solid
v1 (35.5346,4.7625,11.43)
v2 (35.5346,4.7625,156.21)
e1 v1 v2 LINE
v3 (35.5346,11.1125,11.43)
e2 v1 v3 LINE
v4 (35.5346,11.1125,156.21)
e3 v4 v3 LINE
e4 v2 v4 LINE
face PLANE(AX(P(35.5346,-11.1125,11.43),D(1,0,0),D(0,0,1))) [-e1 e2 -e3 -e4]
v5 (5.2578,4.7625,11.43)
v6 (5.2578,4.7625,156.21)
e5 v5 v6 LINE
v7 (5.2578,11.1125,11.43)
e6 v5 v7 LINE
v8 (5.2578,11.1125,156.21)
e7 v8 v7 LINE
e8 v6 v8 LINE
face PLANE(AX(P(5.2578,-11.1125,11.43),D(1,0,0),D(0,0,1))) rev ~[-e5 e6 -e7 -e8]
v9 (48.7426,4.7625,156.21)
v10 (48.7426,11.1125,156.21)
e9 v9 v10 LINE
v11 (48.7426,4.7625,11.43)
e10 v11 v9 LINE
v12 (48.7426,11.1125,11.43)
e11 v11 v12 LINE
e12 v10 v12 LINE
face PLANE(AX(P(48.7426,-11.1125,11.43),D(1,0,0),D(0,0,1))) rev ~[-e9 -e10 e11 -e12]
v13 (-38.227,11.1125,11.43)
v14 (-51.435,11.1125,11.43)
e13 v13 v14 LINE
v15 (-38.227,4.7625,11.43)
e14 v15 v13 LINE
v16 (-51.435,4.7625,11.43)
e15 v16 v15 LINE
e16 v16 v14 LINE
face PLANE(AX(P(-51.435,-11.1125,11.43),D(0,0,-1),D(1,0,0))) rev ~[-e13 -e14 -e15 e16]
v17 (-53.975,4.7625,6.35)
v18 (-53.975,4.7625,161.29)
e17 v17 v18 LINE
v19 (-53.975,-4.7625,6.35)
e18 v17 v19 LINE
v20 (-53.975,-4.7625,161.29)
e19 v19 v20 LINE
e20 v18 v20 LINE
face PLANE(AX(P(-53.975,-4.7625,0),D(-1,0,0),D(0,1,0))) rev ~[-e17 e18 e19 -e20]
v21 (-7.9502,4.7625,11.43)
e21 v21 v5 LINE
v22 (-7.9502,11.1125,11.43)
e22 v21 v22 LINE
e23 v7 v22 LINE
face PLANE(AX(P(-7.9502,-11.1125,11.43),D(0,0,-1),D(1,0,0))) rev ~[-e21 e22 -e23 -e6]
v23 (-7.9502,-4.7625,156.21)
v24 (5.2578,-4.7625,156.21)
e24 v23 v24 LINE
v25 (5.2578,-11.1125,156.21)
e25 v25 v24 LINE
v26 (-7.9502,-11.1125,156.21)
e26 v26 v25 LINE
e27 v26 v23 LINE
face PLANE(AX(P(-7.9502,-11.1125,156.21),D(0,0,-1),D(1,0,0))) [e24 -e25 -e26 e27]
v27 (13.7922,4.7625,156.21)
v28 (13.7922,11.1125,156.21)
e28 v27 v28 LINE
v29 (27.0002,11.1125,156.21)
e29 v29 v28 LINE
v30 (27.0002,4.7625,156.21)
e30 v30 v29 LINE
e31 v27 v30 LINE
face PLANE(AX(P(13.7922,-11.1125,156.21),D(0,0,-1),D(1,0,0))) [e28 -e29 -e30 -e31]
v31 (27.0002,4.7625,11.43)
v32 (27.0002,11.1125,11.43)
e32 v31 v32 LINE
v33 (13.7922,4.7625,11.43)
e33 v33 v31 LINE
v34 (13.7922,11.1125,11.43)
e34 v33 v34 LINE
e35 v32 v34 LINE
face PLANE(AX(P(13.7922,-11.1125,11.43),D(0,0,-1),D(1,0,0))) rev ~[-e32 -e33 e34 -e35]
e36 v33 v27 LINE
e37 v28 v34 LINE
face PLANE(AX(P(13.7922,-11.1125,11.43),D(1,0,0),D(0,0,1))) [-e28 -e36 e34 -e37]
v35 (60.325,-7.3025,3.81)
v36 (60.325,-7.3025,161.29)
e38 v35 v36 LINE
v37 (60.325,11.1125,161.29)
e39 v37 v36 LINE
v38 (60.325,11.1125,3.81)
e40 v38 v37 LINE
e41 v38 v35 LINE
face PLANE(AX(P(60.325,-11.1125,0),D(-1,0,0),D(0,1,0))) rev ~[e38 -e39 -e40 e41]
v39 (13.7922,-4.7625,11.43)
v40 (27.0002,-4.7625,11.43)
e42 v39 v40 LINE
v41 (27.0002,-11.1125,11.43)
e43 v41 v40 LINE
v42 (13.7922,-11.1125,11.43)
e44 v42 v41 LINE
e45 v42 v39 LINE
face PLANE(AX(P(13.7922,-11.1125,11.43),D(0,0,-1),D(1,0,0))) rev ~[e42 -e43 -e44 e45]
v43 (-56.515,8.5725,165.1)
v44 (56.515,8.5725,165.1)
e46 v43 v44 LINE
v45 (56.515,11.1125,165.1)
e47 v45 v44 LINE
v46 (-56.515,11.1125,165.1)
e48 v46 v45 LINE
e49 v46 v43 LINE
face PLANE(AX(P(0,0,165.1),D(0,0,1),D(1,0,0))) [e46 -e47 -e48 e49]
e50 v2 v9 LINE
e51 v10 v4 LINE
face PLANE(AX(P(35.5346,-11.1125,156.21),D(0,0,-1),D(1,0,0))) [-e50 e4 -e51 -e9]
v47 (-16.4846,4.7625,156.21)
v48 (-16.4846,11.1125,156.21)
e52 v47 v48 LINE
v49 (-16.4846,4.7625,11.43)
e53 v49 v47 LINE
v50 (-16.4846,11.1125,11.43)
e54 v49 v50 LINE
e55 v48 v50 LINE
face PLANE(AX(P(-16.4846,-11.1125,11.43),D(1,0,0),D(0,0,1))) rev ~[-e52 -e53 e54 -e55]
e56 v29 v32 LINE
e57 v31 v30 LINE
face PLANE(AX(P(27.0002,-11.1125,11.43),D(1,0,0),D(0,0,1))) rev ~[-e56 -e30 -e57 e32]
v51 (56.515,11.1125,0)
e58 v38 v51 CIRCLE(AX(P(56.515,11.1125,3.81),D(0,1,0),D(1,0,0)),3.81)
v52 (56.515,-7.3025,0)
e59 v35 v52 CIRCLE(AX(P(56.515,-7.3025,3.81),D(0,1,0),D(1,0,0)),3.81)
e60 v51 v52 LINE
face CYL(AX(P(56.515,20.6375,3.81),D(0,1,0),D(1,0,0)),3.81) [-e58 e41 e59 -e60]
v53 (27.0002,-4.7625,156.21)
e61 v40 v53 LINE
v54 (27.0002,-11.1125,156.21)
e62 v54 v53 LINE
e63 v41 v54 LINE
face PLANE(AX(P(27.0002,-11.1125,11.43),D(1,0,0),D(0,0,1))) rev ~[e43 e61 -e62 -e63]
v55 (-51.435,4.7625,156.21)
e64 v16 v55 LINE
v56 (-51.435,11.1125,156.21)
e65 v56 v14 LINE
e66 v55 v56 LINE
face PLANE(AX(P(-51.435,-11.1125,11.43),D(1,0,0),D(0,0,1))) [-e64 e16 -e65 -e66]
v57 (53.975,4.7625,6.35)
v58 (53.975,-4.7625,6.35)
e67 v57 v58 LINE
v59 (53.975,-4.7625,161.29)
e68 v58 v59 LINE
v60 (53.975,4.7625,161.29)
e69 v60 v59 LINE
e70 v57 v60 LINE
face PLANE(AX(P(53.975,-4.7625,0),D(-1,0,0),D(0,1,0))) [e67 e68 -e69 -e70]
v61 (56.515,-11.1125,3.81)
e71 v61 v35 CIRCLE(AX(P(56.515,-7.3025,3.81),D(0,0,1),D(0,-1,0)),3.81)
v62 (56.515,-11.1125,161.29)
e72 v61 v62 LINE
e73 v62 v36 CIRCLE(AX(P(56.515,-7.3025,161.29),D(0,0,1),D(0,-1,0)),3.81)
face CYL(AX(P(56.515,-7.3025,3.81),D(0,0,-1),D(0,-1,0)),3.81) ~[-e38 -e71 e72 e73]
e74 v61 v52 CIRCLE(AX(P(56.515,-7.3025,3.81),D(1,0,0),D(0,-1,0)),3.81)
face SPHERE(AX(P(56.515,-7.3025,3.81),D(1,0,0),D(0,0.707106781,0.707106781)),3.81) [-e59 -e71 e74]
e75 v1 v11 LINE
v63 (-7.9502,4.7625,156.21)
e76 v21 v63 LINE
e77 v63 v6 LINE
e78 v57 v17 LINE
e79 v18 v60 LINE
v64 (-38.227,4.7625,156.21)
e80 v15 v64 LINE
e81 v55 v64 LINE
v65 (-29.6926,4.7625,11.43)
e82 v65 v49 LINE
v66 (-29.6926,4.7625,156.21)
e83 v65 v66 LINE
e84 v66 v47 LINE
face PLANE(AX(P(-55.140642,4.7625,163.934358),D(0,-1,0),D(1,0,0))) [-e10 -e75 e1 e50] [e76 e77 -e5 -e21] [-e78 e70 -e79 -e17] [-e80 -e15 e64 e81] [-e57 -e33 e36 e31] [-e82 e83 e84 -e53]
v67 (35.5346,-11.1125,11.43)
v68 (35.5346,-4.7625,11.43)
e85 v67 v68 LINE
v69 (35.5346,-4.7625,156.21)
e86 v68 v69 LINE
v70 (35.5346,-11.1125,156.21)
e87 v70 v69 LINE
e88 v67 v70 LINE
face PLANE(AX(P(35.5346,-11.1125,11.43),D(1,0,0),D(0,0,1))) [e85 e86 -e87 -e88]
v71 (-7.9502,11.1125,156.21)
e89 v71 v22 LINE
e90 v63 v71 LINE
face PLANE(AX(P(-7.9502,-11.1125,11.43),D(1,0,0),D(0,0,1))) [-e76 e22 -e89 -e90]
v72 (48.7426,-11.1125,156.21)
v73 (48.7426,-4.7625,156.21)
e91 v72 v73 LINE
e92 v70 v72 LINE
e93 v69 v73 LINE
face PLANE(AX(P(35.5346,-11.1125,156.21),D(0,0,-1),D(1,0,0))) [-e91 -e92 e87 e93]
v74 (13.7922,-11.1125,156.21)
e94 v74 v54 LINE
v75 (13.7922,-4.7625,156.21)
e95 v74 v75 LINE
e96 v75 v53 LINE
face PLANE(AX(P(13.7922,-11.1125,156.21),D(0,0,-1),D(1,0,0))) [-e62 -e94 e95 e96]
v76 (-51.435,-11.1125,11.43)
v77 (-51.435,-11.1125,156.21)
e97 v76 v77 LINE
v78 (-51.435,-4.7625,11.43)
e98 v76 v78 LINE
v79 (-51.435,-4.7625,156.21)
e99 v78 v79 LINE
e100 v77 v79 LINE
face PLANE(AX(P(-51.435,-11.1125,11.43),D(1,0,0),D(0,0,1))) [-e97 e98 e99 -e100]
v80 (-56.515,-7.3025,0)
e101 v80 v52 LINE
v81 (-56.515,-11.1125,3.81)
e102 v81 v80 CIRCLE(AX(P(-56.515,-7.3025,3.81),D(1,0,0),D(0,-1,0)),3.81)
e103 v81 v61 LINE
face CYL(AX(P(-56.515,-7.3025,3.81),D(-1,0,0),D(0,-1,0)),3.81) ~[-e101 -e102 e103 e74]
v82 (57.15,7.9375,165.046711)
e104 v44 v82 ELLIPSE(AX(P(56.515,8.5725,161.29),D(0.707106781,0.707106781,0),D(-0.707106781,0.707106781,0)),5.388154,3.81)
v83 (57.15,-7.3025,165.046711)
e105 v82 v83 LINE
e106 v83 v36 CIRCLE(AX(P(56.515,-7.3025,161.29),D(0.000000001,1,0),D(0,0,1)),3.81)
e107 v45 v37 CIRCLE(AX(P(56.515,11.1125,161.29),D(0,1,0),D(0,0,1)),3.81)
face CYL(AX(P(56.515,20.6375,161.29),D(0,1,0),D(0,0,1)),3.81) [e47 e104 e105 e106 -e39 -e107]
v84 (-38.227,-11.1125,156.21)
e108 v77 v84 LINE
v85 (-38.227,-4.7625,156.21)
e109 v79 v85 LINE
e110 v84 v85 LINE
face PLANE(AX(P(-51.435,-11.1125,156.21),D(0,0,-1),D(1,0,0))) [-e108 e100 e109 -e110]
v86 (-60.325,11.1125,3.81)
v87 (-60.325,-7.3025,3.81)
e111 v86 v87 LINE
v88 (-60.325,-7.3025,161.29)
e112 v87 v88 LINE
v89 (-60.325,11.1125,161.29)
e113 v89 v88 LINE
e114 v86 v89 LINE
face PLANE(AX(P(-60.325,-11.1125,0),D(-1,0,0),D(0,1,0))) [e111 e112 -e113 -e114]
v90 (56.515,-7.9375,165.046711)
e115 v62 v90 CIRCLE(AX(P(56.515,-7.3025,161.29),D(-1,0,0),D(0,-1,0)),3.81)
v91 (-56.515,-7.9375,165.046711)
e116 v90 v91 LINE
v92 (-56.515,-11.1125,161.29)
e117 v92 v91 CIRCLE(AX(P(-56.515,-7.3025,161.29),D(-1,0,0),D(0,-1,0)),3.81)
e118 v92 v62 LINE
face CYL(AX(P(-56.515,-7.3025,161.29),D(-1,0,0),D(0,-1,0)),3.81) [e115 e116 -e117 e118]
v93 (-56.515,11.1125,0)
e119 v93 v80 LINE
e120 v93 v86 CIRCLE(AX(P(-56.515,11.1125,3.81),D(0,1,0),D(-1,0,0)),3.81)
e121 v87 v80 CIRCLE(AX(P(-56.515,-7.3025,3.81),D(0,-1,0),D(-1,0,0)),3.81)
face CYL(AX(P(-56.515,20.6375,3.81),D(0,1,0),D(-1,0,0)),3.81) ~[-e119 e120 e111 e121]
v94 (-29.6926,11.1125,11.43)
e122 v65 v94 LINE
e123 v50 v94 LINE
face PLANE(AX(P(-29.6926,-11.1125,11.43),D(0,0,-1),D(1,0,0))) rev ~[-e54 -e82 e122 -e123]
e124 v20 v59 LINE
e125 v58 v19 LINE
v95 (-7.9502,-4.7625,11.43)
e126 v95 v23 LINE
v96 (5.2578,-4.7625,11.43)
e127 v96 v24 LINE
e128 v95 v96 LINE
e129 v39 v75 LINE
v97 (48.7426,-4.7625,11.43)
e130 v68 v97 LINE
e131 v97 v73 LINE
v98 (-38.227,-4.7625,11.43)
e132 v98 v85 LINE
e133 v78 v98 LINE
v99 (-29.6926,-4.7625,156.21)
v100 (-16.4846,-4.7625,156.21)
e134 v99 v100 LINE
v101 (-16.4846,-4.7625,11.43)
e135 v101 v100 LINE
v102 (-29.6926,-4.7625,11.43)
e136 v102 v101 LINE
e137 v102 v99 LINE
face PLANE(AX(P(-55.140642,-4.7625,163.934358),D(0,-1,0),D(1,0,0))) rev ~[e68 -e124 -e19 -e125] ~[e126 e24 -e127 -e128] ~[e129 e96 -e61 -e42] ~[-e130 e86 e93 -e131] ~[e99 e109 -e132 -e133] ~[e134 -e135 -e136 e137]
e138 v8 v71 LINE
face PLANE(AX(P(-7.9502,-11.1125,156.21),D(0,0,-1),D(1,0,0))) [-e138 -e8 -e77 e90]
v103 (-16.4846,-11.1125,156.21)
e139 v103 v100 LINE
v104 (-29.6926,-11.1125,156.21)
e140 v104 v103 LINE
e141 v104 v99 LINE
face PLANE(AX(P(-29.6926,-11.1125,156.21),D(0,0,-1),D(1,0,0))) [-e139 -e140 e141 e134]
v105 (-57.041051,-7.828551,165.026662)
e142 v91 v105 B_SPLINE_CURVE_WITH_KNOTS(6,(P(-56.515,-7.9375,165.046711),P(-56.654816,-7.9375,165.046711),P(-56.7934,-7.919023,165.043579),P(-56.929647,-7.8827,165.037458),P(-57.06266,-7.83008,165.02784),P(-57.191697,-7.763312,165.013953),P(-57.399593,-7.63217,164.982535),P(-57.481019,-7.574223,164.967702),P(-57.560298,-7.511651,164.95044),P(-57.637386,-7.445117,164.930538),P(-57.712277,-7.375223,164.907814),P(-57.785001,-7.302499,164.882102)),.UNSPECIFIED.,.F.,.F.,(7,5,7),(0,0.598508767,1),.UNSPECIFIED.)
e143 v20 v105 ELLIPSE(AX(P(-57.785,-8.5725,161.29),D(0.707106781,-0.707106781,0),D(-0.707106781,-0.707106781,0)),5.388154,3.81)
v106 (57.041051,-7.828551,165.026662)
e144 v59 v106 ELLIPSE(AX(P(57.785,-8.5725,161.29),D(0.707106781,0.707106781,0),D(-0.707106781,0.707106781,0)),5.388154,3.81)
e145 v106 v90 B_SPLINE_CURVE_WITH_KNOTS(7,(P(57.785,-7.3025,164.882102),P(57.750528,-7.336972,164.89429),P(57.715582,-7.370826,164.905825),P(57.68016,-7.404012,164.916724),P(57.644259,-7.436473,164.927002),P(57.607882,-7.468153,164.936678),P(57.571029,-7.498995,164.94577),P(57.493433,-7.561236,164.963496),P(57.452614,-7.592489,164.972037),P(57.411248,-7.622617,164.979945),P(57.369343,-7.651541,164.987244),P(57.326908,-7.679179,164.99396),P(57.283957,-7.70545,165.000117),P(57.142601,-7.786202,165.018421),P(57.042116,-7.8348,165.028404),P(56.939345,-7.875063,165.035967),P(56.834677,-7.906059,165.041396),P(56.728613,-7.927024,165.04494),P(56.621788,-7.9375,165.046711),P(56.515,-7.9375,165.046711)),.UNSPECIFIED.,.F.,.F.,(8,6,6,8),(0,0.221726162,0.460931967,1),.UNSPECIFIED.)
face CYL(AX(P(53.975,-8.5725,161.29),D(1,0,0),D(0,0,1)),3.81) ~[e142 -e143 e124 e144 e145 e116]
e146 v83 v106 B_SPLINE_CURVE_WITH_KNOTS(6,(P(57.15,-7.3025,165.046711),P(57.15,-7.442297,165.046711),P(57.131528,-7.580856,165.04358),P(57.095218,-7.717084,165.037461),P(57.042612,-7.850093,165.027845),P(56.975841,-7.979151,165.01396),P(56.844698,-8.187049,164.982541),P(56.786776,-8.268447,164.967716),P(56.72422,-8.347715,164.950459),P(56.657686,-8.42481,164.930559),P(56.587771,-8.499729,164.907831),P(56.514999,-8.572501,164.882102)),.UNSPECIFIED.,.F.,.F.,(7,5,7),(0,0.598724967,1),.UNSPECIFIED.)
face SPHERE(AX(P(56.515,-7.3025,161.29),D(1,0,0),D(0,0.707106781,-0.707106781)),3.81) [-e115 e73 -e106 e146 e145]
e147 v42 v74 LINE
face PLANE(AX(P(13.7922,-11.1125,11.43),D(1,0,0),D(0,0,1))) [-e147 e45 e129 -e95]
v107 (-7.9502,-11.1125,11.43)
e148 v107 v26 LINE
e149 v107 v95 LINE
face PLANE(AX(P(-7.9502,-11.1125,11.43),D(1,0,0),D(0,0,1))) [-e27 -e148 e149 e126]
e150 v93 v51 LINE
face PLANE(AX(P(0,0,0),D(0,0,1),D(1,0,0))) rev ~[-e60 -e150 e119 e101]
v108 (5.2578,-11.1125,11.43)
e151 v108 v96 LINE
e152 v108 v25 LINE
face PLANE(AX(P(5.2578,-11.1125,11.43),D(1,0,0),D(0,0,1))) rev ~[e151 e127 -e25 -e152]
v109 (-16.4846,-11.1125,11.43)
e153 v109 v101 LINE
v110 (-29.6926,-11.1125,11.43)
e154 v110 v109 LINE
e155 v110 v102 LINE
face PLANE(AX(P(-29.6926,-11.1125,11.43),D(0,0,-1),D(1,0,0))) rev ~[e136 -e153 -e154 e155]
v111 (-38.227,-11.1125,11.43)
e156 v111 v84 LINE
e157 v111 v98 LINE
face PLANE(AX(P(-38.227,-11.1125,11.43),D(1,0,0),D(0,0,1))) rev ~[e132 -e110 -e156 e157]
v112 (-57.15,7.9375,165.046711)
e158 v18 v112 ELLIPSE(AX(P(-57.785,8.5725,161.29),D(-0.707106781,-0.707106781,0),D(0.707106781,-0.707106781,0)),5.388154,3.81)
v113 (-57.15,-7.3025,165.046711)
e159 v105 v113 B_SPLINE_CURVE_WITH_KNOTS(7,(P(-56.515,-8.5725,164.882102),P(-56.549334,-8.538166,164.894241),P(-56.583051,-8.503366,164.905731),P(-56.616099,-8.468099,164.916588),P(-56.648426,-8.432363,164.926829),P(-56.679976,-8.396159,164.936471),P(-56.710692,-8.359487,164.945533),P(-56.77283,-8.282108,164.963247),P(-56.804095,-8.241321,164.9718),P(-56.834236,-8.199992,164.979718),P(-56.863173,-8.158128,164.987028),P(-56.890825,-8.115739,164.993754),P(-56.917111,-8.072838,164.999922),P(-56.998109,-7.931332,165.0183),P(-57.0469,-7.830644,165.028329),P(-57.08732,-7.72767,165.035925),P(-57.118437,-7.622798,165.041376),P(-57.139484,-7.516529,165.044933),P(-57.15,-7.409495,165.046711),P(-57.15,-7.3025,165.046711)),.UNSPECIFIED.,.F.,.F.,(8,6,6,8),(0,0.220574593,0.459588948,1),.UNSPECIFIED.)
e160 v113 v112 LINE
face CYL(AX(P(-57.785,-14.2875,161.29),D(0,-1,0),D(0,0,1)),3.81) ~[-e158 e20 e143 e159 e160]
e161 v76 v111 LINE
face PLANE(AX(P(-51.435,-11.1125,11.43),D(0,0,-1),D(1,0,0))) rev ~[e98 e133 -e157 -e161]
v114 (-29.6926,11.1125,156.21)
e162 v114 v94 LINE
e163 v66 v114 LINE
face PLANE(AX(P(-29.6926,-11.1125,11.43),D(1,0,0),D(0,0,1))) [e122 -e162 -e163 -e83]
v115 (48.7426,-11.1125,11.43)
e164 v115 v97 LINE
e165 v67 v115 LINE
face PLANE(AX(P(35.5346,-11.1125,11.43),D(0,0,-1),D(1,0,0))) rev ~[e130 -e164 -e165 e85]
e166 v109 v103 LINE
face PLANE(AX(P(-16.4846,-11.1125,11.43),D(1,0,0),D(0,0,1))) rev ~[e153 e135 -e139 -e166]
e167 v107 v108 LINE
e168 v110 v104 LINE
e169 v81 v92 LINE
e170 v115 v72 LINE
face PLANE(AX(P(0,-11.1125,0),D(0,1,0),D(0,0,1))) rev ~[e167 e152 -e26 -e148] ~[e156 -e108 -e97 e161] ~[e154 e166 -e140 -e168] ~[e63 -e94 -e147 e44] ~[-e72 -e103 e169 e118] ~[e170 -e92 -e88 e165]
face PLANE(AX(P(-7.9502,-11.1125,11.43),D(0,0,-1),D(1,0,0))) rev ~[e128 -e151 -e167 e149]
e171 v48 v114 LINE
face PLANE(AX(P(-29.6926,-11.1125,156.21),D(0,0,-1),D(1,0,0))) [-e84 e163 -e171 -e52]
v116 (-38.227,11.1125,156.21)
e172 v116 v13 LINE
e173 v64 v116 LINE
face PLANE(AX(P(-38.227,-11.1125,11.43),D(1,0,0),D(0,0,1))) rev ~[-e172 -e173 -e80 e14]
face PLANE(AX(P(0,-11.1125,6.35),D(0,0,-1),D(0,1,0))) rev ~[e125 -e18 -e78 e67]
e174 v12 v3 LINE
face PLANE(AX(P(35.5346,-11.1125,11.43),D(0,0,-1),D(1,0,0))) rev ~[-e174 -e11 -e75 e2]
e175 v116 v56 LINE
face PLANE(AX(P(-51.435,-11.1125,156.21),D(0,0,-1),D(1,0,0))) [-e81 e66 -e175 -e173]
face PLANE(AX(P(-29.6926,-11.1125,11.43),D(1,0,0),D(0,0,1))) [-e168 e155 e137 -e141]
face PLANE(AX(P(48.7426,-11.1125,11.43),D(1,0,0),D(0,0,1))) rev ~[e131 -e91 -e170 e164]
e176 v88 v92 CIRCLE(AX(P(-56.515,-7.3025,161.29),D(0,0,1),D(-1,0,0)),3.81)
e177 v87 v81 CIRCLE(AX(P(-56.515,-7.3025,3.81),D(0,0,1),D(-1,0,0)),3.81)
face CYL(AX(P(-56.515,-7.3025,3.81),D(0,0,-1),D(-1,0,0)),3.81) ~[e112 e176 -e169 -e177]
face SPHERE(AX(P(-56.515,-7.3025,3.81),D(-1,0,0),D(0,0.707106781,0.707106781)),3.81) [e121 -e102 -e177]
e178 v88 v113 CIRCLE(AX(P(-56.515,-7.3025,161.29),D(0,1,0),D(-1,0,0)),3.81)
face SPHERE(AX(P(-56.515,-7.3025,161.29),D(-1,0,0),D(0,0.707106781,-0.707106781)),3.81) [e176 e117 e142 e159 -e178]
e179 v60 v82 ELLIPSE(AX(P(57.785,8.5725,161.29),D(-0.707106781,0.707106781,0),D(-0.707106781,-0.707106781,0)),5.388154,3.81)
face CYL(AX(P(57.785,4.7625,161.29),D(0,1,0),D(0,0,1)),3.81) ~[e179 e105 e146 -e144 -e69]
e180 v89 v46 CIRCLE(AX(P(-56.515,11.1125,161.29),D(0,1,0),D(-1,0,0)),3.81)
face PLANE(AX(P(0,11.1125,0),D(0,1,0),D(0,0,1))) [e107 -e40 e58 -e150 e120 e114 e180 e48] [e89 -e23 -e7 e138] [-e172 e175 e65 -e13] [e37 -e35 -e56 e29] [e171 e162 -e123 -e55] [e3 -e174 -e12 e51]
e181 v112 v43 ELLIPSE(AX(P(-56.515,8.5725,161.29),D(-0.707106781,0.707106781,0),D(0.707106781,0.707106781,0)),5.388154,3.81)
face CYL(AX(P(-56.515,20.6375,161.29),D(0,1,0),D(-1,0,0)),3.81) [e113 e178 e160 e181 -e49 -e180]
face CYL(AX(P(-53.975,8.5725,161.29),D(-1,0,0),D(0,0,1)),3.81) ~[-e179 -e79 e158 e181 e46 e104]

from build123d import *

# Parameters (mm, degrees)
F0_W         = 120.65
F0_H         = 22.225
F0_W_2       = 107.95
F0_H_2       = 9.525
F1_DEPTH     = 165.1
F2_W         = 22.225
F2_H         = 6.35
F3_DEPTH     = 55.88
F5_T1_DEPTH  = 113.03
F5_T3_DEPTH  = 27.94
F5_T5_DEPTH  = 157.48
F5_T7_DEPTH  = 9.525
F5_T9_DEPTH  = 107.95
F5_S13_W     = 3.81
F5_S13_H     = 3.81
F5_T14_DEPTH = 3.81
F5_S19_W     = 3.81
F5_S19_H     = 3.81
F5_T20_DEPTH = 3.81
F5_S25_W     = 3.81
F5_S25_H     = 3.81
F5_T26_DEPTH = 3.81
F5_S31_W     = 3.81
F5_S31_H     = 3.81
F5_T32_DEPTH = 3.81
F5_T39_DEPTH = 117.475
F5_T43_DEPTH = 19.05
F5_T50_DEPTH = 19.05
F5_T54_DEPTH = 117.475
F5_T61_DEPTH = 19.05
F5_T65_DEPTH = 117.475
F5_T72_DEPTH = 19.05
F5_T76_DEPTH = 117.475
F4_W         = 13.208
F4_H         = 144.78
F6_DEPTH     = 40.64


# Not quite as in the source:
# - a fillet or chamfer that OpenCascade refuses, or shapes differently, is made with other operations: its cross-section is extruded or revolved along the edge and cut away or added
# - a feature names something its author has since deleted; it is built from what else it names


with BuildPart() as f1:
    # F0 (on Top) → F1 (new body)
    with BuildSketch(Plane.XY):
        Rectangle(F0_W, F0_H)
        Rectangle(F0_W_2, F0_H_2, mode=Mode.SUBTRACT)
    extrude(amount=F1_DEPTH)

    # F2 (on Right) → F3 (join, symmetric)
    with BuildSketch(Plane.YZ):
        with Locations((0, 3.175)):
            Rectangle(F2_W, F2_H)
    extrude(amount=F3_DEPTH, both=True)

    # F5: fillet of radius 3.81 on 12 edges, made by hand

    # F5_s2 → F5_t1 (cut)
    with BuildSketch(Plane.YZ.offset(-56.515)):
        with BuildLine():
            ThreePointArc((-11.1125, 161.29), (-9.9965768363, 163.9840768363), (-7.3025, 165.1))
            Line((-7.3025, 165.1), (-11.1125, 165.1))
            Line((-11.1125, 165.1), (-11.1125, 161.29))
        make_face()
        with BuildLine():
            ThreePointArc((-11.1125, 3.81), (-9.9965768363, 1.1159231637), (-7.3025, 0))
            Line((-7.3025, 0), (-11.1125, 0))
            Line((-11.1125, 0), (-11.1125, 3.81))
        make_face()
    extrude(amount=F5_T1_DEPTH, mode=Mode.SUBTRACT)

    # F5_s4 → F5_t3 (cut)
    with BuildSketch(Plane.XZ.offset(-20.6375)):
        with BuildLine():
            ThreePointArc((-60.325, 161.29), (-59.2090768363, 163.9840768363), (-56.515, 165.1))
            Line((-56.515, 165.1), (-60.325, 165.1))
            Line((-60.325, 165.1), (-60.325, 161.29))
        make_face()
        with BuildLine():
            ThreePointArc((56.515, 165.1), (59.2090768363, 163.9840768363), (60.325, 161.29))
            Line((60.325, 161.29), (60.325, 165.1))
            Line((60.325, 165.1), (56.515, 165.1))
        make_face()
        with BuildLine():
            ThreePointArc((60.325, 3.81), (59.2090768363, 1.1159231637), (56.515, 0))
            Line((56.515, 0), (60.325, 0))
            Line((60.325, 0), (60.325, 3.81))
        make_face()
        with BuildLine():
            ThreePointArc((-60.325, 3.81), (-59.2090768363, 1.1159231637), (-56.515, 0))
            Line((-56.515, 0), (-60.325, 0))
            Line((-60.325, 0), (-60.325, 3.81))
        make_face()
    extrude(amount=F5_T3_DEPTH, mode=Mode.SUBTRACT)

    # F5_s6 → F5_t5 (cut)
    with BuildSketch(Plane.XY.offset(3.81)):
        with BuildLine():
            ThreePointArc((56.515, -11.1125), (59.2090768363, -9.9965768363), (60.325, -7.3025))
            Line((60.325, -7.3025), (60.325, -11.1125))
            Line((60.325, -11.1125), (56.515, -11.1125))
        make_face()
        with BuildLine():
            ThreePointArc((-60.325, -7.3025), (-59.2090768363, -9.9965768363), (-56.515, -11.1125))
            Line((-56.515, -11.1125), (-60.325, -11.1125))
            Line((-60.325, -11.1125), (-60.325, -7.3025))
        make_face()
    extrude(amount=F5_T5_DEPTH, mode=Mode.SUBTRACT)

    # F5_s8 → F5_t7 (cut)
    with BuildSketch(Plane.XZ.offset(-4.7625)):
        with BuildLine():
            ThreePointArc((57.785, 165.1), (55.0909231637, 163.9840768363), (53.975, 161.29))
            Line((53.975, 161.29), (53.975, 165.1))
            Line((53.975, 165.1), (57.785, 165.1))
        make_face()
        with BuildLine():
            ThreePointArc((-57.785, 165.1), (-55.0909231637, 163.9840768363), (-53.975, 161.29))
            Line((-53.975, 161.29), (-53.975, 165.1))
            Line((-53.975, 165.1), (-57.785, 165.1))
        make_face()
    extrude(amount=F5_T7_DEPTH, mode=Mode.SUBTRACT)

    # F5_s10 → F5_t9 (cut)
    with BuildSketch(Plane.YZ.offset(-53.975)):
        with BuildLine():
            ThreePointArc((-8.5725, 165.1), (-5.8784231637, 163.9840768363), (-4.7625, 161.29))
            Line((-4.7625, 161.29), (-4.7625, 165.1))
            Line((-4.7625, 165.1), (-8.5725, 165.1))
        make_face()
        with BuildLine():
            ThreePointArc((8.5725, 165.1), (5.8784231637, 163.9840768363), (4.7625, 161.29))
            Line((4.7625, 161.29), (4.7625, 165.1))
            Line((4.7625, 165.1), (8.5725, 165.1))
        make_face()
    extrude(amount=F5_T9_DEPTH, mode=Mode.SUBTRACT)


with BuildPart() as f5_tool12:
    # F5_s13 → F5_t14 (new body)
    with BuildSketch(Plane.YZ.offset(-56.515)):
        with Locations((-9.2075, 163.195)):
            Rectangle(F5_S13_W, F5_S13_H)
    extrude(amount=-F5_T14_DEPTH)

    # F5_s15 → F5_t16 (revolve, cut)
    with BuildSketch(Plane(origin=(-56.515, -7.3025, 161.29), x_dir=(0, 0.7071067812, -0.7071067812), z_dir=(0, 0.7071067812, 0.7071067812))):
        with BuildLine():
            ThreePointArc((0, -3.81), (3.81, 0), (0, 3.81))
            Line((0, 3.81), (0, -3.81))
        make_face()
    revolve(axis=Axis((-56.515, -7.3025, 161.29), (-1, 0, 0)), mode=Mode.SUBTRACT)


with BuildPart() as f1_1:
    add(f1.part)

    # F5_t11: cut F5_tool12
    add(f5_tool12.part, mode=Mode.SUBTRACT)


with BuildPart() as f5_tool18:
    # F5_s19 → F5_t20 (new body)
    with BuildSketch(Plane.YZ.offset(56.515)):
        with Locations((-9.2075, 163.195)):
            Rectangle(F5_S19_W, F5_S19_H)
    extrude(amount=F5_T20_DEPTH)

    # F5_s21 → F5_t22 (revolve, cut)
    with BuildSketch(Plane(origin=(56.515, -7.3025, 161.29), x_dir=(0, 0.7071067812, -0.7071067812), z_dir=(0, -0.7071067812, -0.7071067812))):
        with BuildLine():
            ThreePointArc((0, -3.81), (3.81, 0), (0, 3.81))
            Line((0, 3.81), (0, -3.81))
        make_face()
    revolve(axis=Axis((56.515, -7.3025, 161.29), (1, 0, 0)), mode=Mode.SUBTRACT)


with BuildPart() as f1_2:
    add(f1_1.part)

    # F5_t17: cut F5_tool18
    add(f5_tool18.part, mode=Mode.SUBTRACT)


with BuildPart() as f5_tool24:
    # F5_s25 → F5_t26 (new body)
    with BuildSketch(Plane.YZ.offset(56.515)):
        with Locations((-9.2075, 1.905)):
            Rectangle(F5_S25_W, F5_S25_H)
    extrude(amount=F5_T26_DEPTH)

    # F5_s27 → F5_t28 (revolve, cut)
    with BuildSketch(Plane(origin=(56.515, -7.3025, 3.81), x_dir=(0, 0.7071067812, 0.7071067812), z_dir=(0, 0.7071067812, -0.7071067812))):
        with BuildLine():
            ThreePointArc((0, -3.81), (3.81, 0), (0, 3.81))
            Line((0, 3.81), (0, -3.81))
        make_face()
    revolve(axis=Axis((56.515, -7.3025, 3.81), (1, 0, 0)), mode=Mode.SUBTRACT)


with BuildPart() as f1_3:
    add(f1_2.part)

    # F5_t23: cut F5_tool24
    add(f5_tool24.part, mode=Mode.SUBTRACT)


with BuildPart() as f5_tool30:
    # F5_s31 → F5_t32 (new body)
    with BuildSketch(Plane.YZ.offset(-56.515)):
        with Locations((-9.2075, 1.905)):
            Rectangle(F5_S31_W, F5_S31_H)
    extrude(amount=-F5_T32_DEPTH)

    # F5_s33 → F5_t34 (revolve, cut)
    with BuildSketch(Plane(origin=(-56.515, -7.3025, 3.81), x_dir=(0, 0.7071067812, 0.7071067812), z_dir=(0, -0.7071067812, 0.7071067812))):
        with BuildLine():
            ThreePointArc((0, -3.81), (3.81, 0), (0, 3.81))
            Line((0, 3.81), (0, -3.81))
        make_face()
    revolve(axis=Axis((-56.515, -7.3025, 3.81), (-1, 0, 0)), mode=Mode.SUBTRACT)


with BuildPart() as f1_4:
    add(f1_3.part)

    # F5_t29: cut F5_tool30
    add(f5_tool30.part, mode=Mode.SUBTRACT)


with BuildPart() as f5_tool37:
    # F5_s38 → F5_t39 (new body)
    with BuildSketch(Plane.YZ.offset(-53.975)):
        with BuildLine():
            ThreePointArc((8.5725, 165.1), (5.8784231637, 163.9840768363), (4.7625, 161.29))
            Line((4.7625, 161.29), (4.7625, 165.1))
            Line((4.7625, 165.1), (8.5725, 165.1))
        make_face()
    extrude(amount=F5_T39_DEPTH)

    split(bisect_by=Plane.YZ.offset(53.975), keep=Keep.TOP)


with BuildPart() as f5_tool41:
    # F5_s42 → F5_t43 (new body)
    with BuildSketch(Plane.XZ.offset(-14.2875)):
        with BuildLine():
            ThreePointArc((57.785, 165.1), (55.0909231637, 163.9840768363), (53.975, 161.29))
            Line((53.975, 161.29), (53.975, 165.1))
            Line((53.975, 165.1), (57.785, 165.1))
        make_face()
    extrude(amount=F5_T43_DEPTH)

    split(bisect_by=Plane.XZ.offset(-4.7625), keep=Keep.BOTTOM)


with BuildPart() as f5_tool37_1:
    add(f5_tool37.part)

    # F5_t45: intersect F5_tool41
    add(f5_tool41.part, mode=Mode.INTERSECT)


with BuildPart() as f1_5:
    add(f1_4.part)

    # F5_t35: cut F5_tool37
    add(f5_tool37_1.part, mode=Mode.SUBTRACT)


with BuildPart() as f5_tool48:
    # F5_s49 → F5_t50 (new body)
    with BuildSketch(Plane.XZ.offset(-4.7625)):
        with BuildLine():
            ThreePointArc((57.785, 165.1), (55.0909231637, 163.9840768363), (53.975, 161.29))
            Line((53.975, 161.29), (53.975, 165.1))
            Line((53.975, 165.1), (57.785, 165.1))
        make_face()
    extrude(amount=F5_T50_DEPTH)

    split(bisect_by=Plane.XZ.offset(4.7625), keep=Keep.TOP)


with BuildPart() as f5_tool52:
    # F5_s53 → F5_t54 (new body)
    with BuildSketch(Plane.YZ.offset(63.5)):
        with BuildLine():
            ThreePointArc((-8.5725, 165.1), (-5.8784231637, 163.9840768363), (-4.7625, 161.29))
            Line((-4.7625, 161.29), (-4.7625, 165.1))
            Line((-4.7625, 165.1), (-8.5725, 165.1))
        make_face()
    extrude(amount=-F5_T54_DEPTH)

    split(bisect_by=Plane.YZ.offset(53.975), keep=Keep.TOP)


with BuildPart() as f5_tool48_1:
    add(f5_tool48.part)

    # F5_t56: intersect F5_tool52
    add(f5_tool52.part, mode=Mode.INTERSECT)


with BuildPart() as f1_6:
    add(f1_5.part)

    # F5_t46: cut F5_tool48
    add(f5_tool48_1.part, mode=Mode.SUBTRACT)


with BuildPart() as f5_tool59:
    # F5_s60 → F5_t61 (new body)
    with BuildSketch(Plane.XZ.offset(14.2875)):
        with BuildLine():
            ThreePointArc((-57.785, 165.1), (-55.0909231637, 163.9840768363), (-53.975, 161.29))
            Line((-53.975, 161.29), (-53.975, 165.1))
            Line((-53.975, 165.1), (-57.785, 165.1))
        make_face()
    extrude(amount=-F5_T61_DEPTH)

    split(bisect_by=Plane.XZ.offset(4.7625), keep=Keep.TOP)


with BuildPart() as f5_tool63:
    # F5_s64 → F5_t65 (new body)
    with BuildSketch(Plane.YZ.offset(53.975)):
        with BuildLine():
            ThreePointArc((-8.5725, 165.1), (-5.8784231637, 163.9840768363), (-4.7625, 161.29))
            Line((-4.7625, 161.29), (-4.7625, 165.1))
            Line((-4.7625, 165.1), (-8.5725, 165.1))
        make_face()
    extrude(amount=-F5_T65_DEPTH)

    split(bisect_by=Plane.YZ.offset(-53.975), keep=Keep.BOTTOM)


with BuildPart() as f5_tool59_1:
    add(f5_tool59.part)

    # F5_t67: intersect F5_tool63
    add(f5_tool63.part, mode=Mode.INTERSECT)


with BuildPart() as f1_7:
    add(f1_6.part)

    # F5_t57: cut F5_tool59
    add(f5_tool59_1.part, mode=Mode.SUBTRACT)


with BuildPart() as f5_tool70:
    # F5_s71 → F5_t72 (new body)
    with BuildSketch(Plane.XZ.offset(4.7625)):
        with BuildLine():
            ThreePointArc((-57.785, 165.1), (-55.0909231637, 163.9840768363), (-53.975, 161.29))
            Line((-53.975, 161.29), (-53.975, 165.1))
            Line((-53.975, 165.1), (-57.785, 165.1))
        make_face()
    extrude(amount=-F5_T72_DEPTH)

    split(bisect_by=Plane.XZ.offset(-4.7625), keep=Keep.BOTTOM)


with BuildPart() as f5_tool74:
    # F5_s75 → F5_t76 (new body)
    with BuildSketch(Plane.YZ.offset(-63.5)):
        with BuildLine():
            ThreePointArc((8.5725, 165.1), (5.8784231637, 163.9840768363), (4.7625, 161.29))
            Line((4.7625, 161.29), (4.7625, 165.1))
            Line((4.7625, 165.1), (8.5725, 165.1))
        make_face()
    extrude(amount=F5_T76_DEPTH)

    split(bisect_by=Plane.YZ.offset(-53.975), keep=Keep.BOTTOM)


with BuildPart() as f5_tool70_1:
    add(f5_tool70.part)

    # F5_t78: intersect F5_tool74
    add(f5_tool74.part, mode=Mode.INTERSECT)


with BuildPart() as f1_8:
    add(f1_7.part)

    # F5_t68: cut F5_tool70
    add(f5_tool70_1.part, mode=Mode.SUBTRACT)

    # F4 (on face) → F6 (cut)
    with BuildSketch(Plane.XZ.offset(11.1125)):
        with Locations((-44.831, 83.82)):
            Rectangle(F4_W, F4_H)
        with Locations((-23.0886, 83.82)):
            Rectangle(F4_W, F4_H)
        with Locations((-1.3462, 83.82)):
            Rectangle(F4_W, F4_H)
        with Locations((20.3962, 83.82)):
            Rectangle(F4_W, F4_H)
        with Locations((42.1386, 83.82)):
            Rectangle(F4_W, F4_H)
    extrude(amount=-F6_DEPTH, mode=Mode.SUBTRACT)


solid = f1_8.part
